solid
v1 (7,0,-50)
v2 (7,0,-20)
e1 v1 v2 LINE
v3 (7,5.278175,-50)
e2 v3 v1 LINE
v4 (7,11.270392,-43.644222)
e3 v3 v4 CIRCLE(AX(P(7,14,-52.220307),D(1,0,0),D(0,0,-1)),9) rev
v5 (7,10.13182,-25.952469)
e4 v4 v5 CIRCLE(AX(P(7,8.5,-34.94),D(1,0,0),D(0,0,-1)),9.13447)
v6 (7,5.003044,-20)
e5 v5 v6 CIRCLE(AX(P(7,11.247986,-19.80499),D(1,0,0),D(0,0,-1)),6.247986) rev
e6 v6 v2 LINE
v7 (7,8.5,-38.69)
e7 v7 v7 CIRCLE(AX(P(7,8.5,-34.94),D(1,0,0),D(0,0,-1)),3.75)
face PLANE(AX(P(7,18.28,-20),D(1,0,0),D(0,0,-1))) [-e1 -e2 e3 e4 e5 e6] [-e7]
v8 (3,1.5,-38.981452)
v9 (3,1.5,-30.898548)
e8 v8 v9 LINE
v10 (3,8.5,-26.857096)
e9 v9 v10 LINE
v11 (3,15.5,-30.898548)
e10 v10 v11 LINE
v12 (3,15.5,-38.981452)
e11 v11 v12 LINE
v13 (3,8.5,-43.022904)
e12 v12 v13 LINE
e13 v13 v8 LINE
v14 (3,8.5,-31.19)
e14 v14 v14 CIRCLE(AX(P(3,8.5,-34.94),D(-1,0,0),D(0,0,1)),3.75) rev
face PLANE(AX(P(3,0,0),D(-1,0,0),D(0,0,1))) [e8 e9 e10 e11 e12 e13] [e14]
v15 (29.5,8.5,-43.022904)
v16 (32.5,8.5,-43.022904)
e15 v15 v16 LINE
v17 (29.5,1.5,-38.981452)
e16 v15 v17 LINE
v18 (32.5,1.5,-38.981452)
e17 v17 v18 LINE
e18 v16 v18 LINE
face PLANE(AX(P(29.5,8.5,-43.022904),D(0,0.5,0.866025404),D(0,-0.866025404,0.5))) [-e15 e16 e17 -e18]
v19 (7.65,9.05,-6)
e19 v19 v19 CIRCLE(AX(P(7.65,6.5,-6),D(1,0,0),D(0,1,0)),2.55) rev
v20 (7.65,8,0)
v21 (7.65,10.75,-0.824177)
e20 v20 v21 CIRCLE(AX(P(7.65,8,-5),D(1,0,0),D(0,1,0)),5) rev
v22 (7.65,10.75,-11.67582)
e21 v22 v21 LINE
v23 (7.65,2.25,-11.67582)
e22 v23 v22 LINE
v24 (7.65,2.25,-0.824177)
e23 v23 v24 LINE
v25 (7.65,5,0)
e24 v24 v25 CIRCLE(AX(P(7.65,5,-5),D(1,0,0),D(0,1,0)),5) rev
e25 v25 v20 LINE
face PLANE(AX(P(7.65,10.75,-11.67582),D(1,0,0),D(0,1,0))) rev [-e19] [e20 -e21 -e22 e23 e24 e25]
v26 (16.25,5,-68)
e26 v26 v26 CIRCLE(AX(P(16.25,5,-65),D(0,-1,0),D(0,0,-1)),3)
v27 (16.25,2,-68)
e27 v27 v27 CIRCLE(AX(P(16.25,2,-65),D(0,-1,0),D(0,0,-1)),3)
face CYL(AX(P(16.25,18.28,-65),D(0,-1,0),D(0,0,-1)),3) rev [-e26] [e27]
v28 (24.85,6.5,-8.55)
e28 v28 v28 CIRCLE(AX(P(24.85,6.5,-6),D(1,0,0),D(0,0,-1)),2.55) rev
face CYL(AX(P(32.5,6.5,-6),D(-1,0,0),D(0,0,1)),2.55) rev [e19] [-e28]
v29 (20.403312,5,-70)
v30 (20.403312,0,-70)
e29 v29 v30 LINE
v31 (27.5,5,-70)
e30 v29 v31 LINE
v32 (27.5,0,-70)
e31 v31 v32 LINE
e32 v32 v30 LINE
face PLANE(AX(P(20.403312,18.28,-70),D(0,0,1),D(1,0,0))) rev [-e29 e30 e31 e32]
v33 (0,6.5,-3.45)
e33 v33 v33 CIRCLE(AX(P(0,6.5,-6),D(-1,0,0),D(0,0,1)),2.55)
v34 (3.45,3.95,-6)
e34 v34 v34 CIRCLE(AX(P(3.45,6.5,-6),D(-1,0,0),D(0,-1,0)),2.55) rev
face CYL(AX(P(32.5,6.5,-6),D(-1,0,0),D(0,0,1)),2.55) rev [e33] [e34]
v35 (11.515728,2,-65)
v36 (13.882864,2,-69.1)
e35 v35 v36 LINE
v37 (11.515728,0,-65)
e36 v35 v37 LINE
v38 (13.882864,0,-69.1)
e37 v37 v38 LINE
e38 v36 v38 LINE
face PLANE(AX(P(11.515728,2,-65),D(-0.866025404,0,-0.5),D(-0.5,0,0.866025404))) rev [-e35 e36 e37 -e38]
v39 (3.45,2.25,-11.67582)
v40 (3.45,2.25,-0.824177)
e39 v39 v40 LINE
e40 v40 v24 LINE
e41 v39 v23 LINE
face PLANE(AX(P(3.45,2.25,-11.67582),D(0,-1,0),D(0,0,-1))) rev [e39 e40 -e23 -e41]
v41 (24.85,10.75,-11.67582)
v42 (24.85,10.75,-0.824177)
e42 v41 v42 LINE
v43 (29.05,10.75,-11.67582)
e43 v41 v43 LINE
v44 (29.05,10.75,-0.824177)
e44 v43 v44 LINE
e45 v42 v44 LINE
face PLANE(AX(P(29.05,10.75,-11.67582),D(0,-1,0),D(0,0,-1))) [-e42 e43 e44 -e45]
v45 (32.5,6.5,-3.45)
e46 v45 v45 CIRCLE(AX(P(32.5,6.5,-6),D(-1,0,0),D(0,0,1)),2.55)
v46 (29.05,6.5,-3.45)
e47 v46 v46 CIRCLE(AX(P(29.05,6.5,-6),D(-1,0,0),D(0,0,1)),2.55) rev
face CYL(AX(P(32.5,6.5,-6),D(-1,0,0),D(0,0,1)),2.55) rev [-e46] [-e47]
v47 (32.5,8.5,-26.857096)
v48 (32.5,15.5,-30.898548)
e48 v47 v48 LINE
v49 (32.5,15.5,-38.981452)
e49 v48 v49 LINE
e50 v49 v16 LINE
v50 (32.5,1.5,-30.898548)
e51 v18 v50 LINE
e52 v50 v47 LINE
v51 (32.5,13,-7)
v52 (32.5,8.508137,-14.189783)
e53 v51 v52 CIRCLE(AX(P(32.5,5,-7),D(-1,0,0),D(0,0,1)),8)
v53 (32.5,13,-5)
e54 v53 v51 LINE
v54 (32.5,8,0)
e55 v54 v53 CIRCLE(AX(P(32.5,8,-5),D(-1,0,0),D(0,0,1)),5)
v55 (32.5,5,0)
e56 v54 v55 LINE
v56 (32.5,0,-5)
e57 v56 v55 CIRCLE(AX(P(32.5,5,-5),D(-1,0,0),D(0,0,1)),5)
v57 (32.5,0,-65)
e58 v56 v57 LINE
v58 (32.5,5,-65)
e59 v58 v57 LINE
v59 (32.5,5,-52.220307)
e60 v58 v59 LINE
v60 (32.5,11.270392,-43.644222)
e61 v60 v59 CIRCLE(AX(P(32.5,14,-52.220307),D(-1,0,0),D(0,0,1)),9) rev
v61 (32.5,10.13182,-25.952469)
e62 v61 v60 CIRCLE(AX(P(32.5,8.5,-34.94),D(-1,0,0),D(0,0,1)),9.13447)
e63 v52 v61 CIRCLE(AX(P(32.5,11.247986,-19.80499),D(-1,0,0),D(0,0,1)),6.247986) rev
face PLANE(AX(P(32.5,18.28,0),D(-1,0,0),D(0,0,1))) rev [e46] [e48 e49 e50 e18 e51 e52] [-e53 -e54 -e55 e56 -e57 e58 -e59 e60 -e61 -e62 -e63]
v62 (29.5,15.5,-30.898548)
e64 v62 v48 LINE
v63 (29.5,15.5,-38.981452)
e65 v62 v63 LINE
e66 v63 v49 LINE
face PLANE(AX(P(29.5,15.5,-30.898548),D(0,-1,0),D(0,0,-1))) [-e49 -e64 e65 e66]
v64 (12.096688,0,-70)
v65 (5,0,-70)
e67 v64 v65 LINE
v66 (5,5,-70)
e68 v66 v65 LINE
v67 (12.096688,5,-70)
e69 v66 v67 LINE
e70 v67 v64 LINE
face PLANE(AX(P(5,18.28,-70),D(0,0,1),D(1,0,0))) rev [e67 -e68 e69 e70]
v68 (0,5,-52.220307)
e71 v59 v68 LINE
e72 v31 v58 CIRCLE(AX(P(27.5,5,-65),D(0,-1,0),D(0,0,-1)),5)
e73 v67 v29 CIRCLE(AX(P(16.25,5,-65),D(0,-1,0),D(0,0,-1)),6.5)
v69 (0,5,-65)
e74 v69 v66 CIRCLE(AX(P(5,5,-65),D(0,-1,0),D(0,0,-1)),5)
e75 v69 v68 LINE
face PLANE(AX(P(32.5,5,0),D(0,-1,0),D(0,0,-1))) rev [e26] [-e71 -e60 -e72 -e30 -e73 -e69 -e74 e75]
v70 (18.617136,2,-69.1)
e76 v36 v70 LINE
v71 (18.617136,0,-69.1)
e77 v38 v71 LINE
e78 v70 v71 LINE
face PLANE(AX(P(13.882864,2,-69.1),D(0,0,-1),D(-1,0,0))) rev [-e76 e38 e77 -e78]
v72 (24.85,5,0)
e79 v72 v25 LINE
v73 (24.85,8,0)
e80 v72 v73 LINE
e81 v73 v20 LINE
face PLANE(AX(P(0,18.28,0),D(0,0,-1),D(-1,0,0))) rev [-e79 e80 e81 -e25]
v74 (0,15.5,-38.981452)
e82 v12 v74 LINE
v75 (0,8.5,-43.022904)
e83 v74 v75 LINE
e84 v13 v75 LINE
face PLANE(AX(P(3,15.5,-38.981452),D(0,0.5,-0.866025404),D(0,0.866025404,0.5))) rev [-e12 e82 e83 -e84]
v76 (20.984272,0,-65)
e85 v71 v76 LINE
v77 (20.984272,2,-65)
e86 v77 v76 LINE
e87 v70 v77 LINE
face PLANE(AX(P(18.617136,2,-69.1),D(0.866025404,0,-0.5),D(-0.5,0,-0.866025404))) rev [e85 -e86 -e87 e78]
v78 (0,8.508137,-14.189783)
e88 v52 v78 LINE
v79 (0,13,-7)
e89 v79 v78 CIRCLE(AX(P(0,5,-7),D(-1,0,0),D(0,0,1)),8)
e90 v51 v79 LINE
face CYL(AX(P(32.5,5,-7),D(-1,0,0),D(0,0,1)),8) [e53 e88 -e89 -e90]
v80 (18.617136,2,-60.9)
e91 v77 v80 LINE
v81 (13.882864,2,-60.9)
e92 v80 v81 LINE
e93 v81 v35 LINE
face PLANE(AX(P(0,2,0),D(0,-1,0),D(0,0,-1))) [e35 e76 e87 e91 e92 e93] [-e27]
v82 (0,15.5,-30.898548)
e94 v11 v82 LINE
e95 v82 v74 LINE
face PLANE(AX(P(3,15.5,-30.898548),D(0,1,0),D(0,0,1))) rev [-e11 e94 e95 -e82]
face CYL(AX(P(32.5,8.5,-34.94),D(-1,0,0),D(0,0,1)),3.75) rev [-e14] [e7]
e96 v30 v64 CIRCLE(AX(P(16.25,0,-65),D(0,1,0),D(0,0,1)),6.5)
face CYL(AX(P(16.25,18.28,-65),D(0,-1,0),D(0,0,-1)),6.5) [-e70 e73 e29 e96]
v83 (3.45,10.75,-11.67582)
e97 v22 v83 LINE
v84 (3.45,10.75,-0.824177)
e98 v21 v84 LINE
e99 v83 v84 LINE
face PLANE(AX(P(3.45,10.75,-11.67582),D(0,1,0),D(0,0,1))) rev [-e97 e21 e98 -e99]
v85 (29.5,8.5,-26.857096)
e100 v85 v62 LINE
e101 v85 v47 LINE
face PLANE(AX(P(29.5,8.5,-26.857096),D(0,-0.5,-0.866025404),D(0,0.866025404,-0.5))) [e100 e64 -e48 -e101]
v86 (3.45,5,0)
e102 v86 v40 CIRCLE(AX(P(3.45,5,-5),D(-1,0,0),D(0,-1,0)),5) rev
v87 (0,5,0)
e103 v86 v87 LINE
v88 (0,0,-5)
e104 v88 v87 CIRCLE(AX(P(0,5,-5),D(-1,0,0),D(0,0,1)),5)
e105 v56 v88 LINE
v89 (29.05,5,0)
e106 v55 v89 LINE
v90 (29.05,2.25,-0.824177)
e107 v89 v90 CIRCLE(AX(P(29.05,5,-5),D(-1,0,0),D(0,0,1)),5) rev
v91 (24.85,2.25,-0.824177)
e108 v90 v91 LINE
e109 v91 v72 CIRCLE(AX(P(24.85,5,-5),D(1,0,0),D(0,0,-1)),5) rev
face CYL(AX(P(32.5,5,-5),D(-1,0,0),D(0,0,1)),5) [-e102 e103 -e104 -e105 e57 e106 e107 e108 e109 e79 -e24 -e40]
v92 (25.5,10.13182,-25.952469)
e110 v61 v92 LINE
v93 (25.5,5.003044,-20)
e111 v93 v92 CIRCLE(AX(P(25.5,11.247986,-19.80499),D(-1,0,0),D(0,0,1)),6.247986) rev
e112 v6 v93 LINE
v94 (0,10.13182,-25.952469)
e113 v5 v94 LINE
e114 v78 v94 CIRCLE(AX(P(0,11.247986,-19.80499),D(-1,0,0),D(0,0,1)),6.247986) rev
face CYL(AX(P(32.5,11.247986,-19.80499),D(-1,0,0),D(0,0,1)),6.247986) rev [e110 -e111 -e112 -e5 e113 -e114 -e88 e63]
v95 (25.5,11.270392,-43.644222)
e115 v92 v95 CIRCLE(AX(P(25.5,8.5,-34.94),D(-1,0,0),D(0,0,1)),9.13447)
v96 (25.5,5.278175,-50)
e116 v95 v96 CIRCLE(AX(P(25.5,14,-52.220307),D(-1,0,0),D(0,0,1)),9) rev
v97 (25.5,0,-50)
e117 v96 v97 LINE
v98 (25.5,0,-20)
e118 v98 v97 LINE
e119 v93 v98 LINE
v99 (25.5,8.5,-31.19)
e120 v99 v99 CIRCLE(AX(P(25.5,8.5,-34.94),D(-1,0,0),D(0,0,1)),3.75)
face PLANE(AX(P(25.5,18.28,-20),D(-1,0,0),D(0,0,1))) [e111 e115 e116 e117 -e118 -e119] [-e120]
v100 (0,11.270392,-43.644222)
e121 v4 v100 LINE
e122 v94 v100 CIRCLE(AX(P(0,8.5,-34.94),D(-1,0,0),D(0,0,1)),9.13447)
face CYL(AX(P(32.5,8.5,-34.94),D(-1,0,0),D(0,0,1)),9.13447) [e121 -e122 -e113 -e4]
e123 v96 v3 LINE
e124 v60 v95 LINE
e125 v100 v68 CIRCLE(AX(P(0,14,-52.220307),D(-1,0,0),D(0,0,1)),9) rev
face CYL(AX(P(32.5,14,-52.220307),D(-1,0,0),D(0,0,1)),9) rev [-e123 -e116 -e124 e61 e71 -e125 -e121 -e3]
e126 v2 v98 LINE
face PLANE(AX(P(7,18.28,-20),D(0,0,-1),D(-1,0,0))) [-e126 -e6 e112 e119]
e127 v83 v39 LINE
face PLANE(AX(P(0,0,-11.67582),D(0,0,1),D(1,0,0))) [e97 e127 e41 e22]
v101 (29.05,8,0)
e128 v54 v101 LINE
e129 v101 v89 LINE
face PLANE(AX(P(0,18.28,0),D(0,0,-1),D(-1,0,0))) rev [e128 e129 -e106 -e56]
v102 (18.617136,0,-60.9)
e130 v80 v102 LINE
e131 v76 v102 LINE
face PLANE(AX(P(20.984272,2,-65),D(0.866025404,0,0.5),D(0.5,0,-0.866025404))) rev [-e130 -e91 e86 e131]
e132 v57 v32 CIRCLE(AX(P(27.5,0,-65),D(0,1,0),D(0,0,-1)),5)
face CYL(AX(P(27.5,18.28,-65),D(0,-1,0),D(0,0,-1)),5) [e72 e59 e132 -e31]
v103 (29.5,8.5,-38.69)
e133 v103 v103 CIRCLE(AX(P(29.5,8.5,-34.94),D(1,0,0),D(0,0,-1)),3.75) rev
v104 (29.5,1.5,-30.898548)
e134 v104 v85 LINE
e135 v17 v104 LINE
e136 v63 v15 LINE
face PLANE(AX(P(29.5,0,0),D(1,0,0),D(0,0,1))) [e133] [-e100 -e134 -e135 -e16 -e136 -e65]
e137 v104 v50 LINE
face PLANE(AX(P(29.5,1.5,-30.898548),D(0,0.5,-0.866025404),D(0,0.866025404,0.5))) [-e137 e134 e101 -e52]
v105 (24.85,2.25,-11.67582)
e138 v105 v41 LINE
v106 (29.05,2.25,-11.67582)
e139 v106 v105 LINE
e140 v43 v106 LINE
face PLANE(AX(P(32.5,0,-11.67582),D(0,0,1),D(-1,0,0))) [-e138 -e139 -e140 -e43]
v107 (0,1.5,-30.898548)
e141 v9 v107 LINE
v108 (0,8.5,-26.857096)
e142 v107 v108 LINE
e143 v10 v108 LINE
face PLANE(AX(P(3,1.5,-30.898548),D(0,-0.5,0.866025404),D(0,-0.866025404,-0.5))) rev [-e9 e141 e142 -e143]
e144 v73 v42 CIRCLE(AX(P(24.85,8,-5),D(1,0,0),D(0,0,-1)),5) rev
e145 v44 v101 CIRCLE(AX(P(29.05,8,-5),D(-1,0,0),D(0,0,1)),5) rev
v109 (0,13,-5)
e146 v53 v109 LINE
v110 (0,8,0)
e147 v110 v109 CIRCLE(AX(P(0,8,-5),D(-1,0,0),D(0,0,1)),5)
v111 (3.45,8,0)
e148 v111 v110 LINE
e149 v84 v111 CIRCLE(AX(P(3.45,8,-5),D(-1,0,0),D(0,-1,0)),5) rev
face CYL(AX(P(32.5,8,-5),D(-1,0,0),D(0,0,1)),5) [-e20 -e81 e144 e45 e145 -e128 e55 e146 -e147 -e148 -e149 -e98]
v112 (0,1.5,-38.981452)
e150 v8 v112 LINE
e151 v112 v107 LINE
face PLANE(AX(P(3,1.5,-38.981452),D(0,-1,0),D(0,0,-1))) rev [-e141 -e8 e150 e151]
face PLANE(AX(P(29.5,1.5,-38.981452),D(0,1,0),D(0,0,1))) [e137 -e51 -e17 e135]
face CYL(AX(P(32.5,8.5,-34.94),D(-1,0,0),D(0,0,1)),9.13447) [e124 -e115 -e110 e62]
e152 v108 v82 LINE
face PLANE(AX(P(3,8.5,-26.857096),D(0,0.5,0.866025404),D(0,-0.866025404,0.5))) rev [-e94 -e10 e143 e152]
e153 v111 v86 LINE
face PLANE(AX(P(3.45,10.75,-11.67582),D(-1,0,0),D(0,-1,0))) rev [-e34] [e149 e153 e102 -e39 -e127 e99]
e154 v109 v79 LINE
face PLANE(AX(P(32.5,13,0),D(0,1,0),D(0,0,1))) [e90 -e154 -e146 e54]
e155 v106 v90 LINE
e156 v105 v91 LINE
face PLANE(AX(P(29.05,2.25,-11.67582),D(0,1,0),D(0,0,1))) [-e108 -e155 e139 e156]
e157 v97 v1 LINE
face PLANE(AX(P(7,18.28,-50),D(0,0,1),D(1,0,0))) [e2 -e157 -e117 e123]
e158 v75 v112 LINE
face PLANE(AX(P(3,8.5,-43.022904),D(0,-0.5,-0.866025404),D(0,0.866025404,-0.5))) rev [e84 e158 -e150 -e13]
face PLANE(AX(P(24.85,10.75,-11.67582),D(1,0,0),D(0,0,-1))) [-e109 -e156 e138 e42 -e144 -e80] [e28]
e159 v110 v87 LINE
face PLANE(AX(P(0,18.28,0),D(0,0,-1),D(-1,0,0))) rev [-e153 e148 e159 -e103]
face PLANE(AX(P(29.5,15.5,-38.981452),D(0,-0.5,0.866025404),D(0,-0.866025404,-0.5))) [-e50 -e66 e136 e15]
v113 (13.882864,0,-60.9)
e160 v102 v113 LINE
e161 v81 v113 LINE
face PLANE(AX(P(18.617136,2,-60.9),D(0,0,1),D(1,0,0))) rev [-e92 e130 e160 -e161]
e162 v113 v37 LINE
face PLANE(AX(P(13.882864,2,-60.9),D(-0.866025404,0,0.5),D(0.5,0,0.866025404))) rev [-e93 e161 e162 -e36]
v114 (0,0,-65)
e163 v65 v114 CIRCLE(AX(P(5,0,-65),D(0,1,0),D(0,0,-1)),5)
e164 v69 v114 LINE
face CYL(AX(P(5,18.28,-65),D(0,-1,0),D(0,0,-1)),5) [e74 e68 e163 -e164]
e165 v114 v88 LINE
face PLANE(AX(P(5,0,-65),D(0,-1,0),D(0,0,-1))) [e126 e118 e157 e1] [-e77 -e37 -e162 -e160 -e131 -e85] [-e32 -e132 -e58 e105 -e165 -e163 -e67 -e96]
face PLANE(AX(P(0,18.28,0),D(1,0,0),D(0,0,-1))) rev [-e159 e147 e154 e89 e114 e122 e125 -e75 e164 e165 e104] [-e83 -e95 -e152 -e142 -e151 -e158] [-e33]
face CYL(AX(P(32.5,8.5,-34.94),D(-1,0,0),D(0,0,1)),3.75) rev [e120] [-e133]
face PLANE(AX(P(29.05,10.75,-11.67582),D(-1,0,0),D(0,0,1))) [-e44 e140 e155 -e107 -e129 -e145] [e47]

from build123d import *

# Parameters (mm, degrees)
SKETCH1_R           = 3
SKETCH1_W           = 18.5
SKETCH1_H           = 30
BOSS_EXTRUDE1_DEPTH = 18.28
SKETCH2_R           = 3.75
SKETCH2_R_2         = 2.55
CUT_EXTRUDE1_DEPTH  = 81.639062495
CUT_EXTRUDE2_DEPTH  = 3
SKETCH4_W           = 4.2
SKETCH4_H           = 8.5
CUT_EXTRUDE3_DEPTH  = 11.67582
CUT_EXTRUDE4_DEPTH  = 2


with BuildPart() as part:
    # Sketch1 → Boss-Extrude1 (new body)
    with BuildSketch(Plane(origin=(0, 0, 0), x_dir=(1, 0, 0), z_dir=(0, 1, 0))):
        with BuildLine():
            Line((0, 0), (32.5, 0))
            Line((32.5, 0), (32.5, 65))
            ThreePointArc((32.5, 65), (31.035533906, 68.535533906), (27.5, 70))
            Line((27.5, 70), (20.403311931, 70))
            ThreePointArc((20.403311931, 70), (16.25, 71.5), (12.096688069, 70))
            Line((12.096688069, 70), (5, 70))
            ThreePointArc((5, 70), (1.464466094, 68.535533906), (0, 65))
            Line((0, 65), (0, 0))
        make_face()
        with Locations((16.25, 65)):
            Circle(SKETCH1_R, mode=Mode.SUBTRACT)
        with Locations((16.25, 35)):
            Rectangle(SKETCH1_W, SKETCH1_H, mode=Mode.SUBTRACT)
    extrude(amount=BOSS_EXTRUDE1_DEPTH)

    # Sketch2 → Cut-Extrude1 (cut, through all)
    with BuildSketch(Plane.ZY):
        with BuildLine():
            Line((-71.5, 18.28), (-71.5, 5))
            Line((-71.5, 5), (-52.220306773, 5))
            ThreePointArc((-52.220306773, 5), (-46.908361498, 6.734792681), (-43.644221508, 11.270391691))
            ThreePointArc((-43.644221508, 11.270391691), (-34.353354824, 17.615612411), (-25.952469379, 10.131819693))
            ThreePointArc((-25.952469379, 10.131819693), (-20.659340597, 5.058687621), (-14.189782649, 8.508137035))
            ThreePointArc((-14.189782649, 8.508137035), (-11.238803116, 11.78472904), (-7, 13))
            Line((-7, 13), (-5, 13))
            ThreePointArc((-5, 13), (-1.464466094, 11.535533906), (0, 8))
            Line((0, 8), (0, 18.28))
            Line((0, 18.28), (-71.5, 18.28))
        make_face()
        with BuildLine():
            ThreePointArc((0, 5), (-1.464466094, 1.464466094), (-5, 0))
            Line((-5, 0), (0, 0))
            Line((0, 0), (0, 5))
        make_face()
        with Locations((-34.94, 8.5)):
            Circle(SKETCH2_R)
        with Locations((-6, 6.5)):
            Circle(SKETCH2_R_2)
    extrude(amount=-CUT_EXTRUDE1_DEPTH, mode=Mode.SUBTRACT)

    # Sketch3 → Cut-Extrude2 (cut)
    with BuildSketch(Plane.ZY):
        Polygon((-26.857096231, 8.5), (-30.898548116, 15.5), (-38.981451884, 15.5), (-43.022903769, 8.5), (-38.981451884, 1.5), (-30.898548116, 1.5), align=None)
    cut_extrude2 = extrude(amount=-CUT_EXTRUDE2_DEPTH, mode=Mode.SUBTRACT)

    # Mirror1: Cut-Extrude2 across plane
    add(cut_extrude2.mirror(Plane.ZY.offset(-16.25)), mode=Mode.SUBTRACT)

    # Sketch4 → Cut-Extrude3 (cut)
    with BuildSketch(Plane.XY):
        with Locations((5.55, 6.5)):
            Rectangle(SKETCH4_W, SKETCH4_H)
    cut_extrude3 = extrude(amount=-CUT_EXTRUDE3_DEPTH, mode=Mode.SUBTRACT)

    # Mirror2: Cut-Extrude3 across plane
    add(cut_extrude3.mirror(Plane.ZY.offset(-16.25)), mode=Mode.SUBTRACT)

    # Sketch5 → Cut-Extrude4 (cut)
    with BuildSketch(Plane.XZ):
        Polygon((11.515727793, -65), (13.882863896, -69.1), (18.617136104, -69.1), (20.984272207, -65), (18.617136104, -60.9), (13.882863896, -60.9), align=None)
    extrude(amount=-CUT_EXTRUDE4_DEPTH, mode=Mode.SUBTRACT)


solid = part.part
